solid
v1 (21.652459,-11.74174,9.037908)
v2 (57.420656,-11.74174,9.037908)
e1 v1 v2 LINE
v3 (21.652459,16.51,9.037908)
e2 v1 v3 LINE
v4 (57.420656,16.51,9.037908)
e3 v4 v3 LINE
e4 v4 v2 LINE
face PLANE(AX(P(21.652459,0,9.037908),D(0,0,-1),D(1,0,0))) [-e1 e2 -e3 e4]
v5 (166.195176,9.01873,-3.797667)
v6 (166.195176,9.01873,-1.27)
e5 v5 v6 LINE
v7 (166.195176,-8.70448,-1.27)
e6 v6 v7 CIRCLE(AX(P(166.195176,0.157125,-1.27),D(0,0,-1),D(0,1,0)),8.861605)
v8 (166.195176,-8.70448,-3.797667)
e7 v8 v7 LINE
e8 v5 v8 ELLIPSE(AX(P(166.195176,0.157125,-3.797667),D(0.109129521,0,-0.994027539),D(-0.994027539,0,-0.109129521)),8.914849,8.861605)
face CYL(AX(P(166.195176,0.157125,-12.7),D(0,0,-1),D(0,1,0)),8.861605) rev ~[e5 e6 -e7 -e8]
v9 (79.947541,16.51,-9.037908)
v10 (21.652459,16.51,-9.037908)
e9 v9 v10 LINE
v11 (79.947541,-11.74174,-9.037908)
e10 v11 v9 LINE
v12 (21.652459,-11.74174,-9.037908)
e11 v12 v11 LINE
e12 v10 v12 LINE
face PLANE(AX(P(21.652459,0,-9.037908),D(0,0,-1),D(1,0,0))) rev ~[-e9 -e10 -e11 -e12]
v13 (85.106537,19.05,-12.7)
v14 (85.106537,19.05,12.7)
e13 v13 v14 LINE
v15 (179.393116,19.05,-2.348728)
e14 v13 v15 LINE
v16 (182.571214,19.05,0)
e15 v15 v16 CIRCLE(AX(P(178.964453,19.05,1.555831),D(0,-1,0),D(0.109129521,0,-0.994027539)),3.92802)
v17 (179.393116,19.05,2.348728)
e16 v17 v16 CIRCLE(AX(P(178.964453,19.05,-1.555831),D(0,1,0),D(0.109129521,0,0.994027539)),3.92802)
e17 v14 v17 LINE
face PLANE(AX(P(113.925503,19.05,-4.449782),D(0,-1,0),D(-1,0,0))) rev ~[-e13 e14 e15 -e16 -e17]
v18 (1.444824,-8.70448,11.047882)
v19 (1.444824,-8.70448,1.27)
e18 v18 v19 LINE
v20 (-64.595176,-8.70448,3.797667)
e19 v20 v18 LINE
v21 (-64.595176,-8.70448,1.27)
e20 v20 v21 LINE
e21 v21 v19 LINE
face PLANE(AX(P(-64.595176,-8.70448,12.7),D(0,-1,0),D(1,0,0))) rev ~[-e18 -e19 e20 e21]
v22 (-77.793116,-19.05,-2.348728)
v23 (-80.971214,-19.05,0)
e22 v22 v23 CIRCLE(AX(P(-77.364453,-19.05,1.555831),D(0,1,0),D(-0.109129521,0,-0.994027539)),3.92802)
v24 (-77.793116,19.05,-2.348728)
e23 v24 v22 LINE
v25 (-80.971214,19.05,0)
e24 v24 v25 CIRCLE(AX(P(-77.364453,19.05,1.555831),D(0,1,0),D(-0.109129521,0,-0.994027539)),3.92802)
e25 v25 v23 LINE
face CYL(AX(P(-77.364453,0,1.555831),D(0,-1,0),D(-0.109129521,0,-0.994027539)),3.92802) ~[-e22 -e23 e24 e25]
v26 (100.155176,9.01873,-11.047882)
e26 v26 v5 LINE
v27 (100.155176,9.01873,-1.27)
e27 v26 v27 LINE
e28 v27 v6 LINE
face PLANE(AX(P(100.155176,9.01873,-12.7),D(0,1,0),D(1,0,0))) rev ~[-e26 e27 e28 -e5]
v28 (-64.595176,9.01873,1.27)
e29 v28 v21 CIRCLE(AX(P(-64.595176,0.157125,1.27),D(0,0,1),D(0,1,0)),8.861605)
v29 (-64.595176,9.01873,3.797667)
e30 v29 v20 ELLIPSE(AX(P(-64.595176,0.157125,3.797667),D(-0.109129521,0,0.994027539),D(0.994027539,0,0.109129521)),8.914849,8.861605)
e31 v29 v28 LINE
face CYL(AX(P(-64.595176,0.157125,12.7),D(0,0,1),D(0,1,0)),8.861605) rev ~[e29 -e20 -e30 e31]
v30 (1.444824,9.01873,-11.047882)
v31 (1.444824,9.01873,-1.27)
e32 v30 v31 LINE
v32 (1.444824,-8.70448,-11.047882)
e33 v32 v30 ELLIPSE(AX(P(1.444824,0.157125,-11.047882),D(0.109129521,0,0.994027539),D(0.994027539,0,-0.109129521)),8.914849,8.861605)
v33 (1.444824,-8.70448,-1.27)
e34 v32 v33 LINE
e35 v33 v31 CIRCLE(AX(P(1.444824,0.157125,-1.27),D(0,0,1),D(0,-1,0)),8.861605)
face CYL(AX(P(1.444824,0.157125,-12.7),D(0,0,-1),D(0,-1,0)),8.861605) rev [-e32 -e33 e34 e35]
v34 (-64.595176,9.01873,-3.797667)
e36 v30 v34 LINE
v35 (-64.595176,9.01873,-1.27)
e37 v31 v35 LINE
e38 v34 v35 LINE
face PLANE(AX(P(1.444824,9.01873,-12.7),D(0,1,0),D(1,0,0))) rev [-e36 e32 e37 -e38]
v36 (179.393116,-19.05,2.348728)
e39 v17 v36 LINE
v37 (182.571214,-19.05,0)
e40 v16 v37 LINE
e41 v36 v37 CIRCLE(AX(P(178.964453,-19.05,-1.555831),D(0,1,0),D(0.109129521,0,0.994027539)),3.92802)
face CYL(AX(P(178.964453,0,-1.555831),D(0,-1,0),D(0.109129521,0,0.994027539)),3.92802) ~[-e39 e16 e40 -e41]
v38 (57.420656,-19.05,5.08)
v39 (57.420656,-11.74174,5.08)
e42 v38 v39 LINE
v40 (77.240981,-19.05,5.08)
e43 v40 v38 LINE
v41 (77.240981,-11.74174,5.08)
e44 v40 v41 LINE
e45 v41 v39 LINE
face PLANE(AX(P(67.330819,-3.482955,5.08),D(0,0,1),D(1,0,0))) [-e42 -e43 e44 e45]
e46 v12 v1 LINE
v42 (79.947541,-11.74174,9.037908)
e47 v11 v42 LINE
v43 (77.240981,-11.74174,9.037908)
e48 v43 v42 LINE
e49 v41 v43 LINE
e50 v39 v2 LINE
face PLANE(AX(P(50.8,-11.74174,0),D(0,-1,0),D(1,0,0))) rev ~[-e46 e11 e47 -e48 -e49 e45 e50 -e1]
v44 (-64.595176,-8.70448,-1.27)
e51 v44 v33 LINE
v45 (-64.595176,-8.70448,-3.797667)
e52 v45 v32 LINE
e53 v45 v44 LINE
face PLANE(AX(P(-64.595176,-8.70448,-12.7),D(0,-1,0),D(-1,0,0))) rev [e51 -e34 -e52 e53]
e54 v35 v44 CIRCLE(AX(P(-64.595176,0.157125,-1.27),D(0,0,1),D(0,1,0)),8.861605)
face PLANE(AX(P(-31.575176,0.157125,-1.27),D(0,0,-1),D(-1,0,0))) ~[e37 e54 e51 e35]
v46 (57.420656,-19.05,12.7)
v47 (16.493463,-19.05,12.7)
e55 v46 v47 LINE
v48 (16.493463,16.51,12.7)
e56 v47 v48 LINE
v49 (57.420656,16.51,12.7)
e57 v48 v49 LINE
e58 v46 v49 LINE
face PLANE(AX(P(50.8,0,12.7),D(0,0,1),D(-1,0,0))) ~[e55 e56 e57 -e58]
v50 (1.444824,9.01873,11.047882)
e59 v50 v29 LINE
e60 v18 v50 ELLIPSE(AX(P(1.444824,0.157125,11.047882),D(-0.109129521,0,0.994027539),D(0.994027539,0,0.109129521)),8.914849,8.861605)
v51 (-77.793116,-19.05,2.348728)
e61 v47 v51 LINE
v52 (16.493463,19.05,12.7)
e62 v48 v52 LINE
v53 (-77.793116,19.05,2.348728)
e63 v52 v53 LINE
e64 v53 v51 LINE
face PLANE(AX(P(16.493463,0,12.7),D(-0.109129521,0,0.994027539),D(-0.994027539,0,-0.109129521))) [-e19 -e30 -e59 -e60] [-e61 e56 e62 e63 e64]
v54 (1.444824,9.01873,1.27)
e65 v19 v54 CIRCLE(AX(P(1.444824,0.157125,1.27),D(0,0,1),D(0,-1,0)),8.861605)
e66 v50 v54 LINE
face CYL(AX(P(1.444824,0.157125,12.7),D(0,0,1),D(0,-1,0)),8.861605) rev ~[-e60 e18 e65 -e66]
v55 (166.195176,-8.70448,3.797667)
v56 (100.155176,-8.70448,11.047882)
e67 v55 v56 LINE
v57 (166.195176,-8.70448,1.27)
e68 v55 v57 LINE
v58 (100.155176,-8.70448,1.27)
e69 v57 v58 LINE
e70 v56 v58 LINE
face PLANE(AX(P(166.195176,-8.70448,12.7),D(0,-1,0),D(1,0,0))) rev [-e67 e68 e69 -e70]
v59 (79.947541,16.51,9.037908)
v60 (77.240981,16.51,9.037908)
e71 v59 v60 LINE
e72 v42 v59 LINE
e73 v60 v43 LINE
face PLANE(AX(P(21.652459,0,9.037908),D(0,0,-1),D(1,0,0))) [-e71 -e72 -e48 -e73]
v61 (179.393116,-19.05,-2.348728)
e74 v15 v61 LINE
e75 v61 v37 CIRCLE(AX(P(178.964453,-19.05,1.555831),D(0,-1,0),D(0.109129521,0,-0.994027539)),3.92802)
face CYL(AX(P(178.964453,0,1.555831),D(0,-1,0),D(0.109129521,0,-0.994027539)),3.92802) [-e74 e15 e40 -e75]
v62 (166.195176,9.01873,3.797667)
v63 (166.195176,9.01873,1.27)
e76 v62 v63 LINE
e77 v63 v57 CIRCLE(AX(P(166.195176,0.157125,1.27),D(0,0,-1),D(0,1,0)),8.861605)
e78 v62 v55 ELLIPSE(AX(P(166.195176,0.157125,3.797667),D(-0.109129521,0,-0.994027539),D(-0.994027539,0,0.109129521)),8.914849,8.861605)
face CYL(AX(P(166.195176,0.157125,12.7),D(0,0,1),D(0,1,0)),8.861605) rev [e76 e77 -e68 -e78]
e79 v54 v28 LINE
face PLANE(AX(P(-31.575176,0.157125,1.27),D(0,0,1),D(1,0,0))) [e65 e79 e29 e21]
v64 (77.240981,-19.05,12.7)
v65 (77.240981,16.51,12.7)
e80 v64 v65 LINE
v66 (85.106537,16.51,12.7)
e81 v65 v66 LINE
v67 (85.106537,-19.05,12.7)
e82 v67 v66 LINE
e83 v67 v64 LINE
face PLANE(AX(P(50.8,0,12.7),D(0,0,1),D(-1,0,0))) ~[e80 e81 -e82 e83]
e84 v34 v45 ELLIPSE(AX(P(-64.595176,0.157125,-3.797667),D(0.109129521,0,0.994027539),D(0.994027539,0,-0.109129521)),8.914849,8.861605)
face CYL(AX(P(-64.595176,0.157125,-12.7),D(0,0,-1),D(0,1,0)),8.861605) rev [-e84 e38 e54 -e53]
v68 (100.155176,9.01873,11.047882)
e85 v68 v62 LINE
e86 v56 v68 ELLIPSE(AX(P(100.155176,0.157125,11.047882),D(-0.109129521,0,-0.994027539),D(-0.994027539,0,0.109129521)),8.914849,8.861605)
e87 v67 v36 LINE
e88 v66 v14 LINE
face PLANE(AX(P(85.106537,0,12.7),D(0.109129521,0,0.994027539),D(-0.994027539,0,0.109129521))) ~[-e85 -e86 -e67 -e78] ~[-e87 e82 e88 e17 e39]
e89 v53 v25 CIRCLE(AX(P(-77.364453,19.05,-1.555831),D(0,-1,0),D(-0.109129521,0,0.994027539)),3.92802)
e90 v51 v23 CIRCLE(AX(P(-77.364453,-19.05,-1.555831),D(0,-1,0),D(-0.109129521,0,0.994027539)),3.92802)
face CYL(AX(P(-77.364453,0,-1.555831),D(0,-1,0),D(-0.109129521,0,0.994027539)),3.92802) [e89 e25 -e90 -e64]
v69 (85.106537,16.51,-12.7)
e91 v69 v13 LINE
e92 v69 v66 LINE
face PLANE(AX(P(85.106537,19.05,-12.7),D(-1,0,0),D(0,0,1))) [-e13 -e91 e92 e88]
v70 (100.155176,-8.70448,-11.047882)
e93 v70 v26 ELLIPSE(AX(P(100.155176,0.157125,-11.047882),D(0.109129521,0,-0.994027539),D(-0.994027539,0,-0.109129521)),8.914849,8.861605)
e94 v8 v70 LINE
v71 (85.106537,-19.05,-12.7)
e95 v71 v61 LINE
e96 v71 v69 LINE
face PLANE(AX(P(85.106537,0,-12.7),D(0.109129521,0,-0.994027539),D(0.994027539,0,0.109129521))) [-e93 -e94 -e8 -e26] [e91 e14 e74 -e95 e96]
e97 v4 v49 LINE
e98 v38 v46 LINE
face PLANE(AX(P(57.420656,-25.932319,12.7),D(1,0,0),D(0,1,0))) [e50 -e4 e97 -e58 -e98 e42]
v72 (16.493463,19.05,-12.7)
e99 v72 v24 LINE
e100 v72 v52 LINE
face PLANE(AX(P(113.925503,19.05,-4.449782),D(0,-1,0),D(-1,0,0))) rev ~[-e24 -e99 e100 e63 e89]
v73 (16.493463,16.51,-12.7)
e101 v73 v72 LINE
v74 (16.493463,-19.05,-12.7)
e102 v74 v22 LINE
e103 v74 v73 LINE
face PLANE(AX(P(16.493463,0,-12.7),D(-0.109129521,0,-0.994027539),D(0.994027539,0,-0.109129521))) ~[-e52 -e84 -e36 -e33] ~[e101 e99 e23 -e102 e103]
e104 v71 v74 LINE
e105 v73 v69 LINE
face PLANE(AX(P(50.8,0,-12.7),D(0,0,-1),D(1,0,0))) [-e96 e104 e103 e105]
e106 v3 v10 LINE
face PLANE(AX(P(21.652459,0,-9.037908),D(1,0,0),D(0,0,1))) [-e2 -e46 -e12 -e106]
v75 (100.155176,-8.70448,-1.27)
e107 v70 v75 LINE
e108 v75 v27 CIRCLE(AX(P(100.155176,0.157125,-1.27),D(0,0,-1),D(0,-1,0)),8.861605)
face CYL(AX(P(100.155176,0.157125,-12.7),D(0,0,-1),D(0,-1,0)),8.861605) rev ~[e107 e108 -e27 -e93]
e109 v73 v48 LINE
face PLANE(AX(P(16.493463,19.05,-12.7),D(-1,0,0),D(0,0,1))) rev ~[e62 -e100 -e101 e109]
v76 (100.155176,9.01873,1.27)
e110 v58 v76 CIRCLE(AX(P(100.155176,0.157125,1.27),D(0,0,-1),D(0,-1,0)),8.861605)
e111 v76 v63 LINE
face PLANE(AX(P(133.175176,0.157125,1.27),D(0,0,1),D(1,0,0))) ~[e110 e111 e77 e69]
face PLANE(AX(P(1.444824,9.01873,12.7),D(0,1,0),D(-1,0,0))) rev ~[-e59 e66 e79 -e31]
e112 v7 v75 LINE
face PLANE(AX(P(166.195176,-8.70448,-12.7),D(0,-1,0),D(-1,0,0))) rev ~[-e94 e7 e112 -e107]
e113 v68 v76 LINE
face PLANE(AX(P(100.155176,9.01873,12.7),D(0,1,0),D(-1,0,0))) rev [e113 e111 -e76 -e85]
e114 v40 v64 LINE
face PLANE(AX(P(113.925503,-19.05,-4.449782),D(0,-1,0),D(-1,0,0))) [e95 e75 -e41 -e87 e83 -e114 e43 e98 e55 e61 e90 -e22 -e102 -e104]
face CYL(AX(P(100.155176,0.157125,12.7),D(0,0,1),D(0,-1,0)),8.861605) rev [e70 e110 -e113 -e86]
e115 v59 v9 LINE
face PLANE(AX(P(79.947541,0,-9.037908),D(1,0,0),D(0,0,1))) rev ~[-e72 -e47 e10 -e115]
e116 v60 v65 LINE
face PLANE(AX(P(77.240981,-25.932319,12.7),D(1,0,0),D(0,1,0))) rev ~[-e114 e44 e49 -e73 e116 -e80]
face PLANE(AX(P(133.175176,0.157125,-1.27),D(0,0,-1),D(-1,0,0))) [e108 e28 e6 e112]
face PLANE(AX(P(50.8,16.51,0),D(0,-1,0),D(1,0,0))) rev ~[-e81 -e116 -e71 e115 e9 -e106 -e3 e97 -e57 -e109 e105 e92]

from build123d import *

# Parameters (mm, degrees)
F1_DEPTH      = 19.05
F4_DEPTH      = 11.43
F8_W          = 58.2950823009
F8_H          = 18.0758163333
F9_DEPTH      = 19.051
F9_DEPTH_BACK = 11.74174
F11_W         = 68.613074236
F11_H         = 25.4
F12_DEPTH     = 2.54
F13_W         = 19.8203250766
F13_H         = 44.8987269774
F14_DEPTH     = 7.62


with BuildPart() as f1:
    # F0 (on Front) → F1 (new body, symmetric)
    with BuildSketch(Plane.XZ):
        with BuildLine():
            Line((16.493462882, 12.7), (-77.7931159433, 2.3487282923))
            ThreePointArc((-77.7931159433, 2.3487282923), (-79.6990393329, 1.6031312535), (-80.9712142796, 0))
            Line((-80.9712142796, 0), (50.8, 0))
            Line((50.8, 0), (50.8, 12.7))
            Line((50.8, 12.7), (16.493462882, 12.7))
        make_face()
    extrude(amount=F1_DEPTH, both=True)

    # F3 (on offset) → F4 (cut)
    with BuildSketch(Plane.XY.offset(12.7)):
        with BuildLine():
            Line((-64.5951760395, -8.7044802925), (1.4448239605, -8.7044802925))
            ThreePointArc((1.4448239605, -8.7044802925), (10.3064292543, 0.1571250013), (1.4448239605, 9.0187302952))
            Line((1.4448239605, 9.0187302952), (-64.5951760395, 9.0187302952))
            ThreePointArc((-64.5951760395, 9.0187302952), (-73.4567813333, 0.1571250013), (-64.5951760395, -8.7044802925))
        make_face()
    extrude(amount=-F4_DEPTH, mode=Mode.SUBTRACT)

    # F5: F1 across plane


with BuildPart() as f1_1:
    add(f1.part)
    add(f1.part.mirror(Plane.XY))

    # F7: F1 across plane


with BuildPart() as f1_2:
    add(f1_1.part)
    add(f1_1.part.mirror(Plane.YZ.offset(50.8)))

    # F8 (on Front) → F9 (cut, two sides)
    with BuildSketch(Plane.XZ) as f9_sk:
        with Locations((50.8, 0)):
            Rectangle(F8_W, F8_H)
    extrude(amount=-F9_DEPTH, mode=Mode.SUBTRACT)
    extrude(f9_sk.sketch, amount=F9_DEPTH_BACK, mode=Mode.SUBTRACT)

    # F11 (on offset) → F12 (cut)
    with BuildSketch(Plane.XZ.offset(-19.05)):
        with Locations((50.8, 0)):
            Rectangle(F11_W, F11_H)
    extrude(amount=F12_DEPTH, mode=Mode.SUBTRACT)

    # F13 (on offset) → F14 (cut)
    with BuildSketch(Plane.XY.offset(12.7)):
        with Locations((67.3308186233, -3.4829550423)):
            Rectangle(F13_W, F13_H)
    extrude(amount=-F14_DEPTH, mode=Mode.SUBTRACT)


solid = f1_2.part
